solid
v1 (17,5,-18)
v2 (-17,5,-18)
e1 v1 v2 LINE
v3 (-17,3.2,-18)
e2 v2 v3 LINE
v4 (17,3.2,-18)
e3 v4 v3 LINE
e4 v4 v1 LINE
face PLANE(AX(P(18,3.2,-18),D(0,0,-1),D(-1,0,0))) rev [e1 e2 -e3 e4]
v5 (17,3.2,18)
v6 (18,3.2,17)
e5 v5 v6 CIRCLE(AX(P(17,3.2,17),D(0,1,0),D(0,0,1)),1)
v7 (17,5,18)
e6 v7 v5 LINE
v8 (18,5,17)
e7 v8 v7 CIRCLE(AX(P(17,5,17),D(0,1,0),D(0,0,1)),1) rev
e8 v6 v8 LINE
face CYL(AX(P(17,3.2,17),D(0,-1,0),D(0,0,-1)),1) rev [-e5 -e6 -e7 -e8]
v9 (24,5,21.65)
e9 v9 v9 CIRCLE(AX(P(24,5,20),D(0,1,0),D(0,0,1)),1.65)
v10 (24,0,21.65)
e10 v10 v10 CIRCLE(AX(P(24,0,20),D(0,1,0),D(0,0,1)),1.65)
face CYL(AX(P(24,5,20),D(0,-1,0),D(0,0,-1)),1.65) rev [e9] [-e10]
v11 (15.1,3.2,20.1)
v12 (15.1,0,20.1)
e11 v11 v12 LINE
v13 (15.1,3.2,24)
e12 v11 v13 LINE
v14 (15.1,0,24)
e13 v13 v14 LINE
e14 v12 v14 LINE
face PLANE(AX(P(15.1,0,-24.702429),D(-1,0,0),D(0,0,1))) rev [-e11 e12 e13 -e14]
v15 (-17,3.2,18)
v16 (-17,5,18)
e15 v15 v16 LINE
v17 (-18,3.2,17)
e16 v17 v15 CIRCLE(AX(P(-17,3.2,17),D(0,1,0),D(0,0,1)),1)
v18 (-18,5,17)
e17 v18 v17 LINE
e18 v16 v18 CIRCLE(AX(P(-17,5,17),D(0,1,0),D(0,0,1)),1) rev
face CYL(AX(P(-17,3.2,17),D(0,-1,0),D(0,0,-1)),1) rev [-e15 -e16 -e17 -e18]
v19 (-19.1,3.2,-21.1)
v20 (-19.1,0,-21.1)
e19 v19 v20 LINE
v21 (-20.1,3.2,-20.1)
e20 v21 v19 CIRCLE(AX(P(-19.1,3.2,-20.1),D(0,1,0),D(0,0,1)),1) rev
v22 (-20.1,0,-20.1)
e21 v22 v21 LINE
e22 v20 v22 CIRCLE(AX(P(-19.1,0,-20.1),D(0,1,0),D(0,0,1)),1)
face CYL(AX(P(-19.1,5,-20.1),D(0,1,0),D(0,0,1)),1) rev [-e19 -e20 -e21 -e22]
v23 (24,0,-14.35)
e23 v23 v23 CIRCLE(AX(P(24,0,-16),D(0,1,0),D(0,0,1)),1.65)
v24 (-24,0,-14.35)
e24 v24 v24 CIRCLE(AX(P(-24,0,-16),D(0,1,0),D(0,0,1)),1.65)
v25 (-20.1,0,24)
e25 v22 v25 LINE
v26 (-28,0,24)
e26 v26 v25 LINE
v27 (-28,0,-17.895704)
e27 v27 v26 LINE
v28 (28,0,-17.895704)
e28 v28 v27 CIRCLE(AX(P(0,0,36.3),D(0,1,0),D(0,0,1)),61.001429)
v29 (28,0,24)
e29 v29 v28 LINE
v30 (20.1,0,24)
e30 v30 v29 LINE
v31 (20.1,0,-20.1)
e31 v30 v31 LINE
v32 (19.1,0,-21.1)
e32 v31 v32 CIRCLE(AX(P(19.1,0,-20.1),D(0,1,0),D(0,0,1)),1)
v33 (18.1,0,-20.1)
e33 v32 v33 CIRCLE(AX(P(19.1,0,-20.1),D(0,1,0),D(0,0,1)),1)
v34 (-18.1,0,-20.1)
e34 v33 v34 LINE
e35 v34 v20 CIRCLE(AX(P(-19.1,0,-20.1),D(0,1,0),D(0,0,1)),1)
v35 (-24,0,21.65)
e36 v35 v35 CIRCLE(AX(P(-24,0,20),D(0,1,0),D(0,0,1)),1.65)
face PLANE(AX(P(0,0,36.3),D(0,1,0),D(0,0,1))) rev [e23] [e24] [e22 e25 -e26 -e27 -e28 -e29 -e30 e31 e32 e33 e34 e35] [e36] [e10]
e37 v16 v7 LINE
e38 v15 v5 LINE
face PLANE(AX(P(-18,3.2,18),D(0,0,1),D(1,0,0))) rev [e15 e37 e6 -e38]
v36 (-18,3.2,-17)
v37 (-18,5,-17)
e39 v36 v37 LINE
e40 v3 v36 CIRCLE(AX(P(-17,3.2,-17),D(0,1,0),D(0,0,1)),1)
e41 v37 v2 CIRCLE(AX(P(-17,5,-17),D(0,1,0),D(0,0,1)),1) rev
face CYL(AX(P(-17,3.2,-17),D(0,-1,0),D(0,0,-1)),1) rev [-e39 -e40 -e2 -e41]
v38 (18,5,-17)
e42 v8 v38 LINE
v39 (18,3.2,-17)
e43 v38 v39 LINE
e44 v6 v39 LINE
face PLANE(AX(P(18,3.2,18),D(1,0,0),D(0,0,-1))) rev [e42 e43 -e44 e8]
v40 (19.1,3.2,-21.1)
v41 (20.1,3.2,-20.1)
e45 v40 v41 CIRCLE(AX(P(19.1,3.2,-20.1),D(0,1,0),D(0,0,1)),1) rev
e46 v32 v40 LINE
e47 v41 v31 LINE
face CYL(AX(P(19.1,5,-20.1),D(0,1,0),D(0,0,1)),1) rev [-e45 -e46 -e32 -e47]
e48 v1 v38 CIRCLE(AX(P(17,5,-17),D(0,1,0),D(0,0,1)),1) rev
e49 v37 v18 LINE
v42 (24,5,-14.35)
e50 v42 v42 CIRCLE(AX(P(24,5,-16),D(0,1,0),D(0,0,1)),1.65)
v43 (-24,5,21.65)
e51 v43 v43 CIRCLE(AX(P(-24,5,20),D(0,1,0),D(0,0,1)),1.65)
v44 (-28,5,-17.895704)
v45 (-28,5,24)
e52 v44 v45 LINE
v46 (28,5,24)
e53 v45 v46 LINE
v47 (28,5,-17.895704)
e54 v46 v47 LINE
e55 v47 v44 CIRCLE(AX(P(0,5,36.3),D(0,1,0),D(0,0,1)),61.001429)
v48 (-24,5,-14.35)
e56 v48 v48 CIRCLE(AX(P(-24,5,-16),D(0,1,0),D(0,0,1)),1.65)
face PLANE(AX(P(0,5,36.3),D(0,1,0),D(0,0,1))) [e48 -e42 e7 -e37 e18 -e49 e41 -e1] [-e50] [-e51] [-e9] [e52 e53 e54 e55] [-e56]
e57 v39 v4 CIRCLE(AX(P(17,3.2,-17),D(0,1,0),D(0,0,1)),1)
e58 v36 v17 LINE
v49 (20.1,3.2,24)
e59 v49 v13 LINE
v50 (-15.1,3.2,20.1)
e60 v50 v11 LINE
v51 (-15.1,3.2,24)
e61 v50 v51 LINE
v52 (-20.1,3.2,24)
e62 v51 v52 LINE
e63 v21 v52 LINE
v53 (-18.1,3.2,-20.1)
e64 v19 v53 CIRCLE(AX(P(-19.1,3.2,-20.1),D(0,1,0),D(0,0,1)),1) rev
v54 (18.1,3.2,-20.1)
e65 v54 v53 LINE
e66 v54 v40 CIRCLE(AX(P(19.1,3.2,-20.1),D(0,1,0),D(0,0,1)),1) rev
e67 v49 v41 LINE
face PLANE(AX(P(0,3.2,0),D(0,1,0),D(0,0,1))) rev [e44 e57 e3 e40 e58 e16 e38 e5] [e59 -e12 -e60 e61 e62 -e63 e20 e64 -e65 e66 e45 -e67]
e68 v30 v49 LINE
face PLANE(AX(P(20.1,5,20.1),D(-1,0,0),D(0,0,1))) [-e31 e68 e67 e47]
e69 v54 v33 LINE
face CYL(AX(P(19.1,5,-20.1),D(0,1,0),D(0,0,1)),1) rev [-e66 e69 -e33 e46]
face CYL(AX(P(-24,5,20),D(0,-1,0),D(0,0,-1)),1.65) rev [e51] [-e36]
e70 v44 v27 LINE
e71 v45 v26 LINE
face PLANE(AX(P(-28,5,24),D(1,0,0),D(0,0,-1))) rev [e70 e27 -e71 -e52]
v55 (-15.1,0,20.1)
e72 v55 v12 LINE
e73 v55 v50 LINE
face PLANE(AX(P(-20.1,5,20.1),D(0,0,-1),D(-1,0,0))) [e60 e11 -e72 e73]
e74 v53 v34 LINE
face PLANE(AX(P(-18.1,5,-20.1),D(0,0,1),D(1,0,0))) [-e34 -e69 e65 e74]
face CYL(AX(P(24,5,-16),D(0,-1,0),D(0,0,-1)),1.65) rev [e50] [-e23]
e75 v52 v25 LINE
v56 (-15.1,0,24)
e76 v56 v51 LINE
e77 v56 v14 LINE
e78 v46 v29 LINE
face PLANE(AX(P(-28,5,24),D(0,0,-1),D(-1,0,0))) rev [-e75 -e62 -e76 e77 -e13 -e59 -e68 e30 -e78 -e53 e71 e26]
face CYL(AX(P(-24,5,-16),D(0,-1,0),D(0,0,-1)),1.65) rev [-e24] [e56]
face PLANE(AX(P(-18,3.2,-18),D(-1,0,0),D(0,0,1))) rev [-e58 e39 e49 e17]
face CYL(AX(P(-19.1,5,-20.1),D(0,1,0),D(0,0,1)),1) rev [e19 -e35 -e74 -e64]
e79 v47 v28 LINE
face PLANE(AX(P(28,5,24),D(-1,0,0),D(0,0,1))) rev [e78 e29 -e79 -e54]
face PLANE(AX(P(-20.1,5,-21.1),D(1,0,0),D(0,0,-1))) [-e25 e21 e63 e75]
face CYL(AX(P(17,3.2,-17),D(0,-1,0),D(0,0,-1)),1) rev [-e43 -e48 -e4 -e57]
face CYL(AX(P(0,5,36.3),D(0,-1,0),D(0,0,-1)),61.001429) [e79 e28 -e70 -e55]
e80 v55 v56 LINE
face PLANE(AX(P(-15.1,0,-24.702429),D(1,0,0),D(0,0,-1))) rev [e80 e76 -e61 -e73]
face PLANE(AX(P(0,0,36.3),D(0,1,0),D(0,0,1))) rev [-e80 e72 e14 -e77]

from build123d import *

# Parameters (mm, degrees)
SKETCH1_R           = 1.65
BOSS_EXTRUDE1_DEPTH = 5
SKETCH2_W           = 36
SKETCH2_H           = 36
BOSS_EXTRUDE2_DEPTH = 1.8
CUT_EXTRUDE1_REACH  = 58.399
SKETCH3_W           = 5
SKETCH3_H           = 3.2
FILLET1_R           = 1


with BuildPart() as part:
    # Sketch1 → Boss-Extrude1 (new body)
    with BuildSketch(Plane(origin=(0, 0, 0), x_dir=(1, 0, 0), z_dir=(0, 1, 0))):
        with BuildLine():
            Line((-28, -24), (28, -24))
            Line((28, -24), (28, 17.89570392))
            ThreePointArc((28, 17.89570392), (0, 24.701428863), (-28, 17.89570392))
            Line((-28, 17.89570392), (-28, -24))
        make_face()
        with Locations(Location((-24, 16, 0), (0, 0, 270))):
            Circle(SKETCH1_R, mode=Mode.SUBTRACT)
        with Locations(Location((24, 16, 0), (0, 0, 270))):
            Circle(SKETCH1_R, mode=Mode.SUBTRACT)
        with Locations(Location((-24, -20, 0), (0, 0, 270))):
            Circle(SKETCH1_R, mode=Mode.SUBTRACT)
        with Locations(Location((24, -20, 0), (0, 0, 270))):
            Circle(SKETCH1_R, mode=Mode.SUBTRACT)
        Polygon((20.1, -20.1), (20.1, 21.1), (18.1, 21.1), (18.1, 20.1), (-18.1, 20.1), (-18.1, 21.1), (-20.1, 21.1), (-20.1, -20.1), align=None, mode=Mode.SUBTRACT)
    extrude(amount=BOSS_EXTRUDE1_DEPTH)

    # Sketch2 → Boss-Extrude2 (add)
    with BuildSketch(Plane(origin=(0, 5, 0), x_dir=(1, 0, 0), z_dir=(0, 1, 0))):
        Polygon((-20.1, 21.1), (-20.1, -20.1), (20.1, -20.1), (20.1, 21.1), (18.1, 21.1), (18.1, 20.1), (-18.1, 20.1), (-18.1, 21.1), align=None)
        Rectangle(SKETCH2_W, SKETCH2_H, mode=Mode.SUBTRACT)
    extrude(amount=-BOSS_EXTRUDE2_DEPTH)

    # Sketch3 → Cut-Extrude1 (cut, up to next)
    with BuildSketch(Plane.XY.offset(24), mode=Mode.PRIVATE) as cut_extrude1_sk1:
        with Locations((-17.6, 1.6)):
            Rectangle(SKETCH3_W, SKETCH3_H)
    cut_extrude1_tool1 = extrude(cut_extrude1_sk1.sketch, amount=-CUT_EXTRUDE1_REACH, mode=Mode.PRIVATE) & part.part
    # Sketch3 → Cut-Extrude1 (cut, up to next)
    with BuildSketch(Plane.XY.offset(24), mode=Mode.PRIVATE) as cut_extrude1_sk2:
        with Locations((17.6, 1.6)):
            Rectangle(SKETCH3_W, SKETCH3_H)
    cut_extrude1_tool2 = extrude(cut_extrude1_sk2.sketch, amount=-CUT_EXTRUDE1_REACH, mode=Mode.PRIVATE) & part.part
    add(cut_extrude1_tool1.solids().sort_by_distance((-17.6, 1.6, 24))[0], mode=Mode.SUBTRACT)
    add(cut_extrude1_tool2.solids().sort_by_distance((17.6, 1.6, 24))[0], mode=Mode.SUBTRACT)

    # Fillet1
    fillet1_edges = [part.edges().sort_by_distance(p)[0] for p in [
        (-18, 4.1, 18),
        (18, 4.1, 18),
        (18, 4.1, -18),
        (-18, 4.1, -18),
        (-20.1, 1.6, -21.1),
        (-18.1, 1.6, -21.1),
        (18.1, 1.6, -21.1),
        (20.1, 1.6, -21.1),
    ]]
    fillet(fillet1_edges, radius=FILLET1_R - 0.0001)  # a hair under: the kernel refuses the full size


solid = part.part
